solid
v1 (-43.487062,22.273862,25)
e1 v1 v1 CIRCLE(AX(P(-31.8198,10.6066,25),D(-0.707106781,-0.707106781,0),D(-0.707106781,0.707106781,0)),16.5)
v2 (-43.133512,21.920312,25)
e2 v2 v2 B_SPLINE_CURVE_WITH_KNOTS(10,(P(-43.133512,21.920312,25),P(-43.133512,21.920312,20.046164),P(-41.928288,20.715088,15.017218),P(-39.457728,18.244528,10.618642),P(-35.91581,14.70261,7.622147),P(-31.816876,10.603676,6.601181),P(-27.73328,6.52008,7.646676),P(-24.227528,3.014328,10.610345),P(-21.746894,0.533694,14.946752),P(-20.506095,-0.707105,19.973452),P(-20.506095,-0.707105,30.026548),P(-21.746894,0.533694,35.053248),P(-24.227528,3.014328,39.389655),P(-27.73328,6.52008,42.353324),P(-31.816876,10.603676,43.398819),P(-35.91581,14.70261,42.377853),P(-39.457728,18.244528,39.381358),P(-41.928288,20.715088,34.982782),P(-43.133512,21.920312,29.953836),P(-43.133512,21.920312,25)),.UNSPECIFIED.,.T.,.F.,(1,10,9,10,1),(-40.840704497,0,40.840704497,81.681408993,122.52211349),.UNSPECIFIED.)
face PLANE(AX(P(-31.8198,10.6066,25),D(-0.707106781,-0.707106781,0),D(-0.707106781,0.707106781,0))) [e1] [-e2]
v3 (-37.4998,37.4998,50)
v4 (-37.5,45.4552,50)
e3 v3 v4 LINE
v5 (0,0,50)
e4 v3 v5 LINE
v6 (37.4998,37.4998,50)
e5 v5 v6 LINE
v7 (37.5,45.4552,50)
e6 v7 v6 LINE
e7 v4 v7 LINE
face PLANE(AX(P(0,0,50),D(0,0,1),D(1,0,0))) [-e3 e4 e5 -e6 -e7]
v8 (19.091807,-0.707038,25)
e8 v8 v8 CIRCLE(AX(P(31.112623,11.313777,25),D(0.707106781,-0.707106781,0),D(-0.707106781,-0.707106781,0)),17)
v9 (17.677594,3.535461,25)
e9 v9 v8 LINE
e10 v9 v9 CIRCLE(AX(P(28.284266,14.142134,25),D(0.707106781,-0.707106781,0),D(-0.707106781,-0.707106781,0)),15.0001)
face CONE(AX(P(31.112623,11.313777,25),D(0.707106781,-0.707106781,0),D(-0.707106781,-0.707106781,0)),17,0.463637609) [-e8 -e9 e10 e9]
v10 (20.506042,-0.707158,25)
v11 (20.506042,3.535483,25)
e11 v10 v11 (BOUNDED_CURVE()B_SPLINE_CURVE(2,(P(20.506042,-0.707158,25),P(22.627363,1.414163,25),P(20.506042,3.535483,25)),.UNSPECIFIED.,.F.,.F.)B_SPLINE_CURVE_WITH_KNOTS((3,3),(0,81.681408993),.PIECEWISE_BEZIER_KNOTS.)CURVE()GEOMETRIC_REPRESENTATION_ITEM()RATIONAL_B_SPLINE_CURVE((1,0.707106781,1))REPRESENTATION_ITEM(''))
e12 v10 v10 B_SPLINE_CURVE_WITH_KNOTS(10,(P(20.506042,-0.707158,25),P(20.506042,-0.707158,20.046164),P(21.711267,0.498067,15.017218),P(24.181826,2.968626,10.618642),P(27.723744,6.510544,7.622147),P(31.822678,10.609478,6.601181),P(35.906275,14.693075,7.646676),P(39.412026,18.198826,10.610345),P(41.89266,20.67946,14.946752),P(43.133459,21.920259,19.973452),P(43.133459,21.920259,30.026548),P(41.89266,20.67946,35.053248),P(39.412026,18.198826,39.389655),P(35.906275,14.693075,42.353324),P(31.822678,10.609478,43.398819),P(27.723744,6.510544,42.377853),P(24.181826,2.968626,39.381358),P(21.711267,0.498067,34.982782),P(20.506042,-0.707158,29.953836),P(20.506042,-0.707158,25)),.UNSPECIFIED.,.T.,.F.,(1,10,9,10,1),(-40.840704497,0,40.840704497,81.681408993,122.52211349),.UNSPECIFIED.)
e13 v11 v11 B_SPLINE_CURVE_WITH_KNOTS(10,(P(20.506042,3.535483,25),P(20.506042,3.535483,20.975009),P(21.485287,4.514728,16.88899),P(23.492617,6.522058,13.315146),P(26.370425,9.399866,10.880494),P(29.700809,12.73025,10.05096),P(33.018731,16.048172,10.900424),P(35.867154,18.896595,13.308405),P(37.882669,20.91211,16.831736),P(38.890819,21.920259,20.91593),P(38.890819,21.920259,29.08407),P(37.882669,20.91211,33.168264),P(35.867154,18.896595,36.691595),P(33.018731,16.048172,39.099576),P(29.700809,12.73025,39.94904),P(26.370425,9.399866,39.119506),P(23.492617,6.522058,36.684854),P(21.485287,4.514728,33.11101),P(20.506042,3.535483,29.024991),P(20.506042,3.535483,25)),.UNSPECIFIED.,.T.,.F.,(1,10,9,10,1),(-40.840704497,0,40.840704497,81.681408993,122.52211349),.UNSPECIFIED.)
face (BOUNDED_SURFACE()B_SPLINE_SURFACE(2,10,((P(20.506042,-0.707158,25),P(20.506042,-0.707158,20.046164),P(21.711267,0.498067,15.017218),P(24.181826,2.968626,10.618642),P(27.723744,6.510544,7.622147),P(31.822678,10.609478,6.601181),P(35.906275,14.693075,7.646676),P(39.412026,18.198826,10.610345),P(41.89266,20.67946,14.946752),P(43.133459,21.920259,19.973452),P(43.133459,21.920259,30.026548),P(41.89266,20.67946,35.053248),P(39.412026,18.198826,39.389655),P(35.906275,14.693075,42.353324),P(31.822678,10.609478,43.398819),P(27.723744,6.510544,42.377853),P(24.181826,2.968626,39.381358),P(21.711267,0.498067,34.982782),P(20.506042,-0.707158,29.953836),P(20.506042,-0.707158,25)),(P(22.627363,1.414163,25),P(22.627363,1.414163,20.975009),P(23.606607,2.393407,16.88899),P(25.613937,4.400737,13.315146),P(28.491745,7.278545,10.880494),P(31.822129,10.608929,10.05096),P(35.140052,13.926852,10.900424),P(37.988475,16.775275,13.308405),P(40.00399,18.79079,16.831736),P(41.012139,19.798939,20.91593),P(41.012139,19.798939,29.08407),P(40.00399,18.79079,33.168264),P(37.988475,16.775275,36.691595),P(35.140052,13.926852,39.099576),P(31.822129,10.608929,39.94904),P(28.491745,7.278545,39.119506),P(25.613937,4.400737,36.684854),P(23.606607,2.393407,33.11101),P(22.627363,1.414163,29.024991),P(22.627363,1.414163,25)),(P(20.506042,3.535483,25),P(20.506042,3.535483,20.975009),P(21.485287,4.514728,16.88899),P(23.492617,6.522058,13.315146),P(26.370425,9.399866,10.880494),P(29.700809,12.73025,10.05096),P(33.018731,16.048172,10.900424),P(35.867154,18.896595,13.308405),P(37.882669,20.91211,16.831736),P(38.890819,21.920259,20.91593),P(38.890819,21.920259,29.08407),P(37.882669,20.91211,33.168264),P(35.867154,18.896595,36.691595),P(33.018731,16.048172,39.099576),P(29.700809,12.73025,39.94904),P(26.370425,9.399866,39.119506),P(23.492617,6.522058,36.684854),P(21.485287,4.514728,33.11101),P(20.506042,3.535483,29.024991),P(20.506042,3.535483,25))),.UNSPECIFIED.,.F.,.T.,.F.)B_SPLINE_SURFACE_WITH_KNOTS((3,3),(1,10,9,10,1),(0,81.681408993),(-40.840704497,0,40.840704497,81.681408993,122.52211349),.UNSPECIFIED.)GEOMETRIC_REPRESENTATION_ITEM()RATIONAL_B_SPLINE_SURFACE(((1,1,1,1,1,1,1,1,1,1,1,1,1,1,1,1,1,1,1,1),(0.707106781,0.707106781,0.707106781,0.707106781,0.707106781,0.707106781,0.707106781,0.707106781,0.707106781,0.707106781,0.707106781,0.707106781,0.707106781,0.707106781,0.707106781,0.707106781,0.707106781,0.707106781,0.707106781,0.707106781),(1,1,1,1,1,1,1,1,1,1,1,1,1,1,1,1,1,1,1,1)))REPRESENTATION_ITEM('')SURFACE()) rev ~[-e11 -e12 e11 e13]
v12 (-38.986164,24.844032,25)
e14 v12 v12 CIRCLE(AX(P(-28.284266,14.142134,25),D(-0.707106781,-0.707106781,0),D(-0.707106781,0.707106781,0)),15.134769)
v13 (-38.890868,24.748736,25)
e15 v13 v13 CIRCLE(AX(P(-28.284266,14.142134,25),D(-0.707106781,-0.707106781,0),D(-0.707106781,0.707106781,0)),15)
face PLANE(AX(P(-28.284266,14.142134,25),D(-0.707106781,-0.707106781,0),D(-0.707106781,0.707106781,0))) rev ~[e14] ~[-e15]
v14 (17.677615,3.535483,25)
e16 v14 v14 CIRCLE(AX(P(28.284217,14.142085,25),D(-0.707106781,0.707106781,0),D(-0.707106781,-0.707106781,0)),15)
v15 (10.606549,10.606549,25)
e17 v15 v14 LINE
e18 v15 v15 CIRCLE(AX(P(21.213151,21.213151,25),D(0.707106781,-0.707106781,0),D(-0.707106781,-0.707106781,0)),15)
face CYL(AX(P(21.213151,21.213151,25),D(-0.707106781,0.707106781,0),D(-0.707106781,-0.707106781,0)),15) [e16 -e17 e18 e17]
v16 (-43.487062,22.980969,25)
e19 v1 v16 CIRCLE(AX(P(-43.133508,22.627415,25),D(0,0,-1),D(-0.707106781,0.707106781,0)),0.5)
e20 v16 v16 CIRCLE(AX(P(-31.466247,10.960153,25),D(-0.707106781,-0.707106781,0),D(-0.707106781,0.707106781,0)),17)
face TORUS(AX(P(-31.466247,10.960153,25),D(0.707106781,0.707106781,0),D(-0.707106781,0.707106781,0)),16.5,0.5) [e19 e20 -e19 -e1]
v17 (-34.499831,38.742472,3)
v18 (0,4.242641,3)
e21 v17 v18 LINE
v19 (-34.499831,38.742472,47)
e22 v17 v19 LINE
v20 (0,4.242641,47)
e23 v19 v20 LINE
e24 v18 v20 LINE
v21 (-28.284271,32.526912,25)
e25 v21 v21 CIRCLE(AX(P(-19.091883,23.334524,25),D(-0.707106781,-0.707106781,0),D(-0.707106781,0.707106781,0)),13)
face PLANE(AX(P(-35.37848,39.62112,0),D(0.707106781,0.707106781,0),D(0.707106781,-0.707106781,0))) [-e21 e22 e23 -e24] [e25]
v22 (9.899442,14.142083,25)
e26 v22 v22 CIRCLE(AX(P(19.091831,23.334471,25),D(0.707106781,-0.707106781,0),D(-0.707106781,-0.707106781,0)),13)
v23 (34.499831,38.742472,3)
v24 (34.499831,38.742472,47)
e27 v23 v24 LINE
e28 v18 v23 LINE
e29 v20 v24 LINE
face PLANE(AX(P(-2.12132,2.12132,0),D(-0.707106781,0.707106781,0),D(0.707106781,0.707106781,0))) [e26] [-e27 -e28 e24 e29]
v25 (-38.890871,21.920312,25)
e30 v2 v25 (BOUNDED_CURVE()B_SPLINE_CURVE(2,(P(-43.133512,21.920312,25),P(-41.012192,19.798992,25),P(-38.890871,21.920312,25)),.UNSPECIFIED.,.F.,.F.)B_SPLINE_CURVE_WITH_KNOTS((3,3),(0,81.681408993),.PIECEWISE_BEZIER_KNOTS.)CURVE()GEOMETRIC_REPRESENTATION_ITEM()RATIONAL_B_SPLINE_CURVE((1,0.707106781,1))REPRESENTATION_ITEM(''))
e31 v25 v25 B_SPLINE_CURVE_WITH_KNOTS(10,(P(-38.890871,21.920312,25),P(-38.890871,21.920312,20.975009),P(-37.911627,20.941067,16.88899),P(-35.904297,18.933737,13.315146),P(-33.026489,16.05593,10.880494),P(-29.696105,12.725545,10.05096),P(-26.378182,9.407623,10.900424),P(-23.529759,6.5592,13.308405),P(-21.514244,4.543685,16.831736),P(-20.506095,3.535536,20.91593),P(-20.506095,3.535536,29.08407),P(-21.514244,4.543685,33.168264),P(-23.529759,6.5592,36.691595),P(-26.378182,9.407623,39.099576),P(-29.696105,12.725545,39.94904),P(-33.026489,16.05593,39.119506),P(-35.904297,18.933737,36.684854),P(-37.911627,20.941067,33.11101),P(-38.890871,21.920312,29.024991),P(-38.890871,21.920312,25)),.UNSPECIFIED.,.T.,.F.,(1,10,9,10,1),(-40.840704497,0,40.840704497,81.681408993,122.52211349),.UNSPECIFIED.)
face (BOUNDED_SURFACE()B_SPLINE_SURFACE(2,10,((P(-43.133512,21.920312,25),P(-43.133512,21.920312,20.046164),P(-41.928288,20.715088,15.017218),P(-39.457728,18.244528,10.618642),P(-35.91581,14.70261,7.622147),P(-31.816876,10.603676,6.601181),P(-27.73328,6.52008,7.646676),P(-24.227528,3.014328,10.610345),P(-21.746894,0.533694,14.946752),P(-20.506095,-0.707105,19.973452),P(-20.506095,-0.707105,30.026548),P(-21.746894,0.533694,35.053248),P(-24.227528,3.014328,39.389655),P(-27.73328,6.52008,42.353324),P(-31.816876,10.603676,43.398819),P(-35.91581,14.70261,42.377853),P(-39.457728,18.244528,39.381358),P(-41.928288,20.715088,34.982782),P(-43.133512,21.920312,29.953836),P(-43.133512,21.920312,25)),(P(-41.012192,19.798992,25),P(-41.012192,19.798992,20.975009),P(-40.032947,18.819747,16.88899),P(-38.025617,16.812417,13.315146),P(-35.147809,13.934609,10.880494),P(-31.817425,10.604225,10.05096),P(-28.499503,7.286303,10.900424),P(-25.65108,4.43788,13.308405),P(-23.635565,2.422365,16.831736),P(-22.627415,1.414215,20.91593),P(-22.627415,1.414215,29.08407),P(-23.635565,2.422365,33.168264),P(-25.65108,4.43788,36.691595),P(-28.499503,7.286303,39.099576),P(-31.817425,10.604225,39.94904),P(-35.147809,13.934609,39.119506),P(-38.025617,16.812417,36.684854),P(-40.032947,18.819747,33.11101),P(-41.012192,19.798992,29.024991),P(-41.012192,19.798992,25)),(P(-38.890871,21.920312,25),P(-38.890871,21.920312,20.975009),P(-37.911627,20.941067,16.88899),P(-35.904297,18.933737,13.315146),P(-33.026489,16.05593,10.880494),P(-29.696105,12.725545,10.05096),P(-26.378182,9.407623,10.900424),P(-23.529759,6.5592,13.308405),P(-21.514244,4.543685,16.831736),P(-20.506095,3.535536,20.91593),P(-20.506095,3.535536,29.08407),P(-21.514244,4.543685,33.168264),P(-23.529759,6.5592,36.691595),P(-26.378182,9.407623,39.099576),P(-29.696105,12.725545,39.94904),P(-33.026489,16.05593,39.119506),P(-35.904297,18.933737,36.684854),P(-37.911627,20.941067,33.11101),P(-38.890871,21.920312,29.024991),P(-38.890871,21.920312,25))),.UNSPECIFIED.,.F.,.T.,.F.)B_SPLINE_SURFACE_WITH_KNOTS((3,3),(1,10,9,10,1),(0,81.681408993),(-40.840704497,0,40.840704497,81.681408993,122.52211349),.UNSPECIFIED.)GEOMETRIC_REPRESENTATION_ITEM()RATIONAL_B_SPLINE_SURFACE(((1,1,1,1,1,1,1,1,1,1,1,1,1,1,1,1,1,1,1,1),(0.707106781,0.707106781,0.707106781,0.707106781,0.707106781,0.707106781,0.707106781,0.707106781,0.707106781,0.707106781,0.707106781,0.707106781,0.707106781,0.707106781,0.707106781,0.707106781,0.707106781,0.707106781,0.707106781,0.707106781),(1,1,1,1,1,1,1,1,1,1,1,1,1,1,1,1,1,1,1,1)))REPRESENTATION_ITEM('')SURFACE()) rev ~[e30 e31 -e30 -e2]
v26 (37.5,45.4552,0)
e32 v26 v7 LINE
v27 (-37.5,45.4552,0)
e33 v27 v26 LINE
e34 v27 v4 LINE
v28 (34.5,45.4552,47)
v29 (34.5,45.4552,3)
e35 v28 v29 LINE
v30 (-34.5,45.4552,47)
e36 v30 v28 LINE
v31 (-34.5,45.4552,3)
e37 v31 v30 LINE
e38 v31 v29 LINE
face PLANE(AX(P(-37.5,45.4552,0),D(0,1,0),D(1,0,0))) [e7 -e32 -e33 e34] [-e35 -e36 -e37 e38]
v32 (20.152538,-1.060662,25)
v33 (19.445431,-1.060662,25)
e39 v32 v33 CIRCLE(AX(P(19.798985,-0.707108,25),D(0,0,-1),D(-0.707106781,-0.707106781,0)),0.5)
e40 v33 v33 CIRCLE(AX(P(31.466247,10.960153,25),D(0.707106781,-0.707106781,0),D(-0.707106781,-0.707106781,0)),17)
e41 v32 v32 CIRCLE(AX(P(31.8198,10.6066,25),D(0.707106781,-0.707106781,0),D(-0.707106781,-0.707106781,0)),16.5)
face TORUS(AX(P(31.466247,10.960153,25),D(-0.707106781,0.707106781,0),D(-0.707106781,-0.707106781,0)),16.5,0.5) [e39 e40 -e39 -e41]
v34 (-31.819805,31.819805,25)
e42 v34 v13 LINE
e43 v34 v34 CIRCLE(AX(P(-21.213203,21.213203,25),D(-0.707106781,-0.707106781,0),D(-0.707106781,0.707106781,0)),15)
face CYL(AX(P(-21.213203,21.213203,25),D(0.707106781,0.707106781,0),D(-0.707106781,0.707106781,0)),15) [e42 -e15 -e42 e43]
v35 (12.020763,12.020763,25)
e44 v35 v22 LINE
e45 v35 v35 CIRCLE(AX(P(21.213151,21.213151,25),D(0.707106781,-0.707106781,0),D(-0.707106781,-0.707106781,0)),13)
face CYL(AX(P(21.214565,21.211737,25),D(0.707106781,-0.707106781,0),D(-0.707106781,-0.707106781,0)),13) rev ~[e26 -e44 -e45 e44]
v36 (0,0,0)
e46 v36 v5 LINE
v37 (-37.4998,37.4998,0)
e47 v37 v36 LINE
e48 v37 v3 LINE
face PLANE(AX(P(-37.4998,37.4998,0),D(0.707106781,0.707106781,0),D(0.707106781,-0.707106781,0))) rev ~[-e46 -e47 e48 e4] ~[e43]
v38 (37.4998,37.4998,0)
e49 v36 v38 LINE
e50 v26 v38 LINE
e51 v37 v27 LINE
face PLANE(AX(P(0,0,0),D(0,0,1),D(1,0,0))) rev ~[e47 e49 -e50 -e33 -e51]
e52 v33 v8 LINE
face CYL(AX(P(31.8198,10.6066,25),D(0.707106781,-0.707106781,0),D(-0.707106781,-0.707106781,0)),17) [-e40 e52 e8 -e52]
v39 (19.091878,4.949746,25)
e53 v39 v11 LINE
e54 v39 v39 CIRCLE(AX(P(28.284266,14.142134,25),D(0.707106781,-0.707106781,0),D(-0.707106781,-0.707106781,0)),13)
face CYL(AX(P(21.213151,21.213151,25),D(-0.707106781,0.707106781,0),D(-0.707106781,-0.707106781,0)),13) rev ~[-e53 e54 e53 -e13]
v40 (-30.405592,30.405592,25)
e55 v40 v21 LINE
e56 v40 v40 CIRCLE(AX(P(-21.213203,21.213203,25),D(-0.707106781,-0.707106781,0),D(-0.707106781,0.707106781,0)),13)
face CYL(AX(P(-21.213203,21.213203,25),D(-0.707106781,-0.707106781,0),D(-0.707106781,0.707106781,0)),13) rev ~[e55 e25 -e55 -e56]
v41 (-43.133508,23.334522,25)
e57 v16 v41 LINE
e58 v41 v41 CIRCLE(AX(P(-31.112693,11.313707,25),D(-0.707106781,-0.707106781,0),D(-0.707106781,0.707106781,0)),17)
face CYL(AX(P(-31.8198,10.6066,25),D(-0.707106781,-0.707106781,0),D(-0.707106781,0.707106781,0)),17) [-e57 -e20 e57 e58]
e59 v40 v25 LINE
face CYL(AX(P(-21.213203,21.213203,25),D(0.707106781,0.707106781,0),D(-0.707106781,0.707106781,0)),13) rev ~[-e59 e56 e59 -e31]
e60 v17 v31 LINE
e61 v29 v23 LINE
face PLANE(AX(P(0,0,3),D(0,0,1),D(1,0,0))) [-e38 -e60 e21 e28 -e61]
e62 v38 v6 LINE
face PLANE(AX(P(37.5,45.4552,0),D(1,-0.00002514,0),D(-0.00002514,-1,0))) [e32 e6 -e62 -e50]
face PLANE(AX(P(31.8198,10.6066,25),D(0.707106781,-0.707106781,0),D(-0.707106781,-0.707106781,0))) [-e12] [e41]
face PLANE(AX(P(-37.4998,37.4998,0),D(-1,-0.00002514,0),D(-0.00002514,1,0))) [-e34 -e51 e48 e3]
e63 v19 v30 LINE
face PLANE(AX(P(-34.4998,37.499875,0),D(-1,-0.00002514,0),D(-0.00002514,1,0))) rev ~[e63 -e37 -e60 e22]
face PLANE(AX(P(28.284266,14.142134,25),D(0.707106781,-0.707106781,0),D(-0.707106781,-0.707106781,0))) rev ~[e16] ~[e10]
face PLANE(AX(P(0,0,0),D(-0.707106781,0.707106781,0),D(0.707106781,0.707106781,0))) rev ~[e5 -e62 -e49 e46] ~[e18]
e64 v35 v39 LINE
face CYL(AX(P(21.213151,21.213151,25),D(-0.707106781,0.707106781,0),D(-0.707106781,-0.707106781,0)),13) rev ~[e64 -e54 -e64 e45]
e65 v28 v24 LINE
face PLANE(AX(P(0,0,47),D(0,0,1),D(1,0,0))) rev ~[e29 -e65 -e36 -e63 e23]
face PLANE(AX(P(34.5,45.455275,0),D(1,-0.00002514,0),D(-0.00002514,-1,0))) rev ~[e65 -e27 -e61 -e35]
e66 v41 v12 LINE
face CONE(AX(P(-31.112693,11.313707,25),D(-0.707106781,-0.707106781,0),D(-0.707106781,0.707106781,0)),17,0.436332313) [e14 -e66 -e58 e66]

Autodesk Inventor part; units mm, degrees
ref_plane "YZ Plane" through (0, 0, 0) normal (1, 0, 0) x (0, 1, 0)
ref_plane "XZ Plane" through (0, 0, 0) normal (0, 1, 0) x (-1, 0, 0)
ref_plane "XY Plane" through (0, 0, 0) normal (0, 0, 1) x (1, 0, 0)
sketch "Sketch1" plane through (0, 0, 0) normal (0, 0, 1) x (1, 0, 0)
  line L0 (0, 0) -> (37.4998, 37.4998)
  line L1 (0, 0) -> (60.1041, 0) construction
  line L2 (-37.4998, 37.4998) -> (0, 0)
  line L3 (-37.5, 45.4552) -> (37.5, 45.4552)
  line L4 (37.5, 45.4552) -> (37.5, 37.4998)
  line L5 (-37.5, 37.4998) -> (-37.5, 45.4552)
  line L6 (0, 40.2877) -> (0, 0)
  line L7 (37.5, 37.4998) -> (37.4998, 37.4998)
  line L8 (-37.4998, 37.4998) -> (-37.5, 37.4998)
  line L9 (-25.0019, 42.5142) -> (24.9981, 42.5142) construction
  line L10 (24.9981, 42.5142) -> (24.9981, 37.5142) construction
  dimension "d0" = 45
  dimension "d39" = 75
  dimension "d41" = 50
  dimension "d42" = 5
extrude "Extrusion1" add sketch "Sketch1" along normal blind 50
shell "Shell2" thickness 3 removed faces 1 at (12.5, 45.4552, 16.6667)
sketch "Sketch2" plane through (37.4998, 37.4998, 50) normal (0.7071068, -0.7071068, 0) x (-0.7071068, -0.7071068, 0)
  circle A0 centre (23.0328, 25) radius 13
  line L0 (53.0328, 0) -> (0, 0) projected
  line L1 (53.0328, 50) -> (53.0328, 0) projected
  circle A1 centre (23.0328, 25) radius 15
  dimension "d5" = 26
  dimension "d6" = 25
  dimension "d7" = 30
  dimension "d26" = 30
sketch "Sketch3" plane through (0, 0, 50) normal (-0.7071068, -0.7071068, 0) x (-0.7071068, 0.7071068, 0)
  circle A0 centre (30, 25) radius 13
  line L0 (0, 50) -> (0, 0) projected
  line L1 (53.0328, 0) -> (0, 0) projected
  circle A1 centre (30, 25) radius 15
  dimension "d8" = 26
  dimension "d9" = 30
  dimension "d10" = 25
  dimension "d29" = 30
extrude "Extrusion2" cut sketch "Sketch3" against normal through all contours A0
extrude "Extrusion3" cut sketch "Sketch2" against normal blind 10 contours A0
extrude "Extrusion6" add sketch "Sketch2" along normal blind 15
extrude "Extrusion7" add sketch "Sketch3" along normal blind 15
sketch "Sketch9" plane through (-31.8198, 10.6066, 25) normal (-0.7071068, -0.7071068, 0) x (-0.7071068, 0.7071068, 0)
  circle A0 centre (0, 0) radius 15
  circle A1 centre (0, 0) radius 17
  point P0 (-30, 25)
  dimension "d81" = 34
extrude "Extrusion12" add sketch "Sketch9" against normal blind 5
chamfer "Chamfer2" distance 4 angle 25 1 edges at (-16.2635, 2.1213, 25) measured on face at (-41.4446, 24.9455, 26.3679)
fillet "Fillet3" radius 3 1 edges at (-22.6274, 1.4142, 25)
fillet "Fillet4" radius 0.5 1 edges at (-19.799, -1.4142, 25)
sketch "Sketch16" plane through (31.8198, 10.6066, 25) normal (0.7071068, -0.7071068, 0) x (-0.7071068, -0.7071068, 0)
  circle A0 centre (0, 0) radius 17
  circle A1 centre (0, 0) radius 13 projected
  point P0 (30, 25)
  dimension "d134" = 34
extrude "Extrusion19" add sketch "Sketch16" against normal blind 5
chamfer "Chamfer3" distance 2 distance2 4 1 edges at (40.3051, 26.163, 25) measured on face at (16.954, 2.8119, 27.5527)
fillet "Fillet7" radius 3 1 edges at (41.0122, 19.799, 25)
fillet "Fillet8" radius 0.5 1 edges at (43.8406, 22.6274, 25)
properties part number "Chamber3-part1"
